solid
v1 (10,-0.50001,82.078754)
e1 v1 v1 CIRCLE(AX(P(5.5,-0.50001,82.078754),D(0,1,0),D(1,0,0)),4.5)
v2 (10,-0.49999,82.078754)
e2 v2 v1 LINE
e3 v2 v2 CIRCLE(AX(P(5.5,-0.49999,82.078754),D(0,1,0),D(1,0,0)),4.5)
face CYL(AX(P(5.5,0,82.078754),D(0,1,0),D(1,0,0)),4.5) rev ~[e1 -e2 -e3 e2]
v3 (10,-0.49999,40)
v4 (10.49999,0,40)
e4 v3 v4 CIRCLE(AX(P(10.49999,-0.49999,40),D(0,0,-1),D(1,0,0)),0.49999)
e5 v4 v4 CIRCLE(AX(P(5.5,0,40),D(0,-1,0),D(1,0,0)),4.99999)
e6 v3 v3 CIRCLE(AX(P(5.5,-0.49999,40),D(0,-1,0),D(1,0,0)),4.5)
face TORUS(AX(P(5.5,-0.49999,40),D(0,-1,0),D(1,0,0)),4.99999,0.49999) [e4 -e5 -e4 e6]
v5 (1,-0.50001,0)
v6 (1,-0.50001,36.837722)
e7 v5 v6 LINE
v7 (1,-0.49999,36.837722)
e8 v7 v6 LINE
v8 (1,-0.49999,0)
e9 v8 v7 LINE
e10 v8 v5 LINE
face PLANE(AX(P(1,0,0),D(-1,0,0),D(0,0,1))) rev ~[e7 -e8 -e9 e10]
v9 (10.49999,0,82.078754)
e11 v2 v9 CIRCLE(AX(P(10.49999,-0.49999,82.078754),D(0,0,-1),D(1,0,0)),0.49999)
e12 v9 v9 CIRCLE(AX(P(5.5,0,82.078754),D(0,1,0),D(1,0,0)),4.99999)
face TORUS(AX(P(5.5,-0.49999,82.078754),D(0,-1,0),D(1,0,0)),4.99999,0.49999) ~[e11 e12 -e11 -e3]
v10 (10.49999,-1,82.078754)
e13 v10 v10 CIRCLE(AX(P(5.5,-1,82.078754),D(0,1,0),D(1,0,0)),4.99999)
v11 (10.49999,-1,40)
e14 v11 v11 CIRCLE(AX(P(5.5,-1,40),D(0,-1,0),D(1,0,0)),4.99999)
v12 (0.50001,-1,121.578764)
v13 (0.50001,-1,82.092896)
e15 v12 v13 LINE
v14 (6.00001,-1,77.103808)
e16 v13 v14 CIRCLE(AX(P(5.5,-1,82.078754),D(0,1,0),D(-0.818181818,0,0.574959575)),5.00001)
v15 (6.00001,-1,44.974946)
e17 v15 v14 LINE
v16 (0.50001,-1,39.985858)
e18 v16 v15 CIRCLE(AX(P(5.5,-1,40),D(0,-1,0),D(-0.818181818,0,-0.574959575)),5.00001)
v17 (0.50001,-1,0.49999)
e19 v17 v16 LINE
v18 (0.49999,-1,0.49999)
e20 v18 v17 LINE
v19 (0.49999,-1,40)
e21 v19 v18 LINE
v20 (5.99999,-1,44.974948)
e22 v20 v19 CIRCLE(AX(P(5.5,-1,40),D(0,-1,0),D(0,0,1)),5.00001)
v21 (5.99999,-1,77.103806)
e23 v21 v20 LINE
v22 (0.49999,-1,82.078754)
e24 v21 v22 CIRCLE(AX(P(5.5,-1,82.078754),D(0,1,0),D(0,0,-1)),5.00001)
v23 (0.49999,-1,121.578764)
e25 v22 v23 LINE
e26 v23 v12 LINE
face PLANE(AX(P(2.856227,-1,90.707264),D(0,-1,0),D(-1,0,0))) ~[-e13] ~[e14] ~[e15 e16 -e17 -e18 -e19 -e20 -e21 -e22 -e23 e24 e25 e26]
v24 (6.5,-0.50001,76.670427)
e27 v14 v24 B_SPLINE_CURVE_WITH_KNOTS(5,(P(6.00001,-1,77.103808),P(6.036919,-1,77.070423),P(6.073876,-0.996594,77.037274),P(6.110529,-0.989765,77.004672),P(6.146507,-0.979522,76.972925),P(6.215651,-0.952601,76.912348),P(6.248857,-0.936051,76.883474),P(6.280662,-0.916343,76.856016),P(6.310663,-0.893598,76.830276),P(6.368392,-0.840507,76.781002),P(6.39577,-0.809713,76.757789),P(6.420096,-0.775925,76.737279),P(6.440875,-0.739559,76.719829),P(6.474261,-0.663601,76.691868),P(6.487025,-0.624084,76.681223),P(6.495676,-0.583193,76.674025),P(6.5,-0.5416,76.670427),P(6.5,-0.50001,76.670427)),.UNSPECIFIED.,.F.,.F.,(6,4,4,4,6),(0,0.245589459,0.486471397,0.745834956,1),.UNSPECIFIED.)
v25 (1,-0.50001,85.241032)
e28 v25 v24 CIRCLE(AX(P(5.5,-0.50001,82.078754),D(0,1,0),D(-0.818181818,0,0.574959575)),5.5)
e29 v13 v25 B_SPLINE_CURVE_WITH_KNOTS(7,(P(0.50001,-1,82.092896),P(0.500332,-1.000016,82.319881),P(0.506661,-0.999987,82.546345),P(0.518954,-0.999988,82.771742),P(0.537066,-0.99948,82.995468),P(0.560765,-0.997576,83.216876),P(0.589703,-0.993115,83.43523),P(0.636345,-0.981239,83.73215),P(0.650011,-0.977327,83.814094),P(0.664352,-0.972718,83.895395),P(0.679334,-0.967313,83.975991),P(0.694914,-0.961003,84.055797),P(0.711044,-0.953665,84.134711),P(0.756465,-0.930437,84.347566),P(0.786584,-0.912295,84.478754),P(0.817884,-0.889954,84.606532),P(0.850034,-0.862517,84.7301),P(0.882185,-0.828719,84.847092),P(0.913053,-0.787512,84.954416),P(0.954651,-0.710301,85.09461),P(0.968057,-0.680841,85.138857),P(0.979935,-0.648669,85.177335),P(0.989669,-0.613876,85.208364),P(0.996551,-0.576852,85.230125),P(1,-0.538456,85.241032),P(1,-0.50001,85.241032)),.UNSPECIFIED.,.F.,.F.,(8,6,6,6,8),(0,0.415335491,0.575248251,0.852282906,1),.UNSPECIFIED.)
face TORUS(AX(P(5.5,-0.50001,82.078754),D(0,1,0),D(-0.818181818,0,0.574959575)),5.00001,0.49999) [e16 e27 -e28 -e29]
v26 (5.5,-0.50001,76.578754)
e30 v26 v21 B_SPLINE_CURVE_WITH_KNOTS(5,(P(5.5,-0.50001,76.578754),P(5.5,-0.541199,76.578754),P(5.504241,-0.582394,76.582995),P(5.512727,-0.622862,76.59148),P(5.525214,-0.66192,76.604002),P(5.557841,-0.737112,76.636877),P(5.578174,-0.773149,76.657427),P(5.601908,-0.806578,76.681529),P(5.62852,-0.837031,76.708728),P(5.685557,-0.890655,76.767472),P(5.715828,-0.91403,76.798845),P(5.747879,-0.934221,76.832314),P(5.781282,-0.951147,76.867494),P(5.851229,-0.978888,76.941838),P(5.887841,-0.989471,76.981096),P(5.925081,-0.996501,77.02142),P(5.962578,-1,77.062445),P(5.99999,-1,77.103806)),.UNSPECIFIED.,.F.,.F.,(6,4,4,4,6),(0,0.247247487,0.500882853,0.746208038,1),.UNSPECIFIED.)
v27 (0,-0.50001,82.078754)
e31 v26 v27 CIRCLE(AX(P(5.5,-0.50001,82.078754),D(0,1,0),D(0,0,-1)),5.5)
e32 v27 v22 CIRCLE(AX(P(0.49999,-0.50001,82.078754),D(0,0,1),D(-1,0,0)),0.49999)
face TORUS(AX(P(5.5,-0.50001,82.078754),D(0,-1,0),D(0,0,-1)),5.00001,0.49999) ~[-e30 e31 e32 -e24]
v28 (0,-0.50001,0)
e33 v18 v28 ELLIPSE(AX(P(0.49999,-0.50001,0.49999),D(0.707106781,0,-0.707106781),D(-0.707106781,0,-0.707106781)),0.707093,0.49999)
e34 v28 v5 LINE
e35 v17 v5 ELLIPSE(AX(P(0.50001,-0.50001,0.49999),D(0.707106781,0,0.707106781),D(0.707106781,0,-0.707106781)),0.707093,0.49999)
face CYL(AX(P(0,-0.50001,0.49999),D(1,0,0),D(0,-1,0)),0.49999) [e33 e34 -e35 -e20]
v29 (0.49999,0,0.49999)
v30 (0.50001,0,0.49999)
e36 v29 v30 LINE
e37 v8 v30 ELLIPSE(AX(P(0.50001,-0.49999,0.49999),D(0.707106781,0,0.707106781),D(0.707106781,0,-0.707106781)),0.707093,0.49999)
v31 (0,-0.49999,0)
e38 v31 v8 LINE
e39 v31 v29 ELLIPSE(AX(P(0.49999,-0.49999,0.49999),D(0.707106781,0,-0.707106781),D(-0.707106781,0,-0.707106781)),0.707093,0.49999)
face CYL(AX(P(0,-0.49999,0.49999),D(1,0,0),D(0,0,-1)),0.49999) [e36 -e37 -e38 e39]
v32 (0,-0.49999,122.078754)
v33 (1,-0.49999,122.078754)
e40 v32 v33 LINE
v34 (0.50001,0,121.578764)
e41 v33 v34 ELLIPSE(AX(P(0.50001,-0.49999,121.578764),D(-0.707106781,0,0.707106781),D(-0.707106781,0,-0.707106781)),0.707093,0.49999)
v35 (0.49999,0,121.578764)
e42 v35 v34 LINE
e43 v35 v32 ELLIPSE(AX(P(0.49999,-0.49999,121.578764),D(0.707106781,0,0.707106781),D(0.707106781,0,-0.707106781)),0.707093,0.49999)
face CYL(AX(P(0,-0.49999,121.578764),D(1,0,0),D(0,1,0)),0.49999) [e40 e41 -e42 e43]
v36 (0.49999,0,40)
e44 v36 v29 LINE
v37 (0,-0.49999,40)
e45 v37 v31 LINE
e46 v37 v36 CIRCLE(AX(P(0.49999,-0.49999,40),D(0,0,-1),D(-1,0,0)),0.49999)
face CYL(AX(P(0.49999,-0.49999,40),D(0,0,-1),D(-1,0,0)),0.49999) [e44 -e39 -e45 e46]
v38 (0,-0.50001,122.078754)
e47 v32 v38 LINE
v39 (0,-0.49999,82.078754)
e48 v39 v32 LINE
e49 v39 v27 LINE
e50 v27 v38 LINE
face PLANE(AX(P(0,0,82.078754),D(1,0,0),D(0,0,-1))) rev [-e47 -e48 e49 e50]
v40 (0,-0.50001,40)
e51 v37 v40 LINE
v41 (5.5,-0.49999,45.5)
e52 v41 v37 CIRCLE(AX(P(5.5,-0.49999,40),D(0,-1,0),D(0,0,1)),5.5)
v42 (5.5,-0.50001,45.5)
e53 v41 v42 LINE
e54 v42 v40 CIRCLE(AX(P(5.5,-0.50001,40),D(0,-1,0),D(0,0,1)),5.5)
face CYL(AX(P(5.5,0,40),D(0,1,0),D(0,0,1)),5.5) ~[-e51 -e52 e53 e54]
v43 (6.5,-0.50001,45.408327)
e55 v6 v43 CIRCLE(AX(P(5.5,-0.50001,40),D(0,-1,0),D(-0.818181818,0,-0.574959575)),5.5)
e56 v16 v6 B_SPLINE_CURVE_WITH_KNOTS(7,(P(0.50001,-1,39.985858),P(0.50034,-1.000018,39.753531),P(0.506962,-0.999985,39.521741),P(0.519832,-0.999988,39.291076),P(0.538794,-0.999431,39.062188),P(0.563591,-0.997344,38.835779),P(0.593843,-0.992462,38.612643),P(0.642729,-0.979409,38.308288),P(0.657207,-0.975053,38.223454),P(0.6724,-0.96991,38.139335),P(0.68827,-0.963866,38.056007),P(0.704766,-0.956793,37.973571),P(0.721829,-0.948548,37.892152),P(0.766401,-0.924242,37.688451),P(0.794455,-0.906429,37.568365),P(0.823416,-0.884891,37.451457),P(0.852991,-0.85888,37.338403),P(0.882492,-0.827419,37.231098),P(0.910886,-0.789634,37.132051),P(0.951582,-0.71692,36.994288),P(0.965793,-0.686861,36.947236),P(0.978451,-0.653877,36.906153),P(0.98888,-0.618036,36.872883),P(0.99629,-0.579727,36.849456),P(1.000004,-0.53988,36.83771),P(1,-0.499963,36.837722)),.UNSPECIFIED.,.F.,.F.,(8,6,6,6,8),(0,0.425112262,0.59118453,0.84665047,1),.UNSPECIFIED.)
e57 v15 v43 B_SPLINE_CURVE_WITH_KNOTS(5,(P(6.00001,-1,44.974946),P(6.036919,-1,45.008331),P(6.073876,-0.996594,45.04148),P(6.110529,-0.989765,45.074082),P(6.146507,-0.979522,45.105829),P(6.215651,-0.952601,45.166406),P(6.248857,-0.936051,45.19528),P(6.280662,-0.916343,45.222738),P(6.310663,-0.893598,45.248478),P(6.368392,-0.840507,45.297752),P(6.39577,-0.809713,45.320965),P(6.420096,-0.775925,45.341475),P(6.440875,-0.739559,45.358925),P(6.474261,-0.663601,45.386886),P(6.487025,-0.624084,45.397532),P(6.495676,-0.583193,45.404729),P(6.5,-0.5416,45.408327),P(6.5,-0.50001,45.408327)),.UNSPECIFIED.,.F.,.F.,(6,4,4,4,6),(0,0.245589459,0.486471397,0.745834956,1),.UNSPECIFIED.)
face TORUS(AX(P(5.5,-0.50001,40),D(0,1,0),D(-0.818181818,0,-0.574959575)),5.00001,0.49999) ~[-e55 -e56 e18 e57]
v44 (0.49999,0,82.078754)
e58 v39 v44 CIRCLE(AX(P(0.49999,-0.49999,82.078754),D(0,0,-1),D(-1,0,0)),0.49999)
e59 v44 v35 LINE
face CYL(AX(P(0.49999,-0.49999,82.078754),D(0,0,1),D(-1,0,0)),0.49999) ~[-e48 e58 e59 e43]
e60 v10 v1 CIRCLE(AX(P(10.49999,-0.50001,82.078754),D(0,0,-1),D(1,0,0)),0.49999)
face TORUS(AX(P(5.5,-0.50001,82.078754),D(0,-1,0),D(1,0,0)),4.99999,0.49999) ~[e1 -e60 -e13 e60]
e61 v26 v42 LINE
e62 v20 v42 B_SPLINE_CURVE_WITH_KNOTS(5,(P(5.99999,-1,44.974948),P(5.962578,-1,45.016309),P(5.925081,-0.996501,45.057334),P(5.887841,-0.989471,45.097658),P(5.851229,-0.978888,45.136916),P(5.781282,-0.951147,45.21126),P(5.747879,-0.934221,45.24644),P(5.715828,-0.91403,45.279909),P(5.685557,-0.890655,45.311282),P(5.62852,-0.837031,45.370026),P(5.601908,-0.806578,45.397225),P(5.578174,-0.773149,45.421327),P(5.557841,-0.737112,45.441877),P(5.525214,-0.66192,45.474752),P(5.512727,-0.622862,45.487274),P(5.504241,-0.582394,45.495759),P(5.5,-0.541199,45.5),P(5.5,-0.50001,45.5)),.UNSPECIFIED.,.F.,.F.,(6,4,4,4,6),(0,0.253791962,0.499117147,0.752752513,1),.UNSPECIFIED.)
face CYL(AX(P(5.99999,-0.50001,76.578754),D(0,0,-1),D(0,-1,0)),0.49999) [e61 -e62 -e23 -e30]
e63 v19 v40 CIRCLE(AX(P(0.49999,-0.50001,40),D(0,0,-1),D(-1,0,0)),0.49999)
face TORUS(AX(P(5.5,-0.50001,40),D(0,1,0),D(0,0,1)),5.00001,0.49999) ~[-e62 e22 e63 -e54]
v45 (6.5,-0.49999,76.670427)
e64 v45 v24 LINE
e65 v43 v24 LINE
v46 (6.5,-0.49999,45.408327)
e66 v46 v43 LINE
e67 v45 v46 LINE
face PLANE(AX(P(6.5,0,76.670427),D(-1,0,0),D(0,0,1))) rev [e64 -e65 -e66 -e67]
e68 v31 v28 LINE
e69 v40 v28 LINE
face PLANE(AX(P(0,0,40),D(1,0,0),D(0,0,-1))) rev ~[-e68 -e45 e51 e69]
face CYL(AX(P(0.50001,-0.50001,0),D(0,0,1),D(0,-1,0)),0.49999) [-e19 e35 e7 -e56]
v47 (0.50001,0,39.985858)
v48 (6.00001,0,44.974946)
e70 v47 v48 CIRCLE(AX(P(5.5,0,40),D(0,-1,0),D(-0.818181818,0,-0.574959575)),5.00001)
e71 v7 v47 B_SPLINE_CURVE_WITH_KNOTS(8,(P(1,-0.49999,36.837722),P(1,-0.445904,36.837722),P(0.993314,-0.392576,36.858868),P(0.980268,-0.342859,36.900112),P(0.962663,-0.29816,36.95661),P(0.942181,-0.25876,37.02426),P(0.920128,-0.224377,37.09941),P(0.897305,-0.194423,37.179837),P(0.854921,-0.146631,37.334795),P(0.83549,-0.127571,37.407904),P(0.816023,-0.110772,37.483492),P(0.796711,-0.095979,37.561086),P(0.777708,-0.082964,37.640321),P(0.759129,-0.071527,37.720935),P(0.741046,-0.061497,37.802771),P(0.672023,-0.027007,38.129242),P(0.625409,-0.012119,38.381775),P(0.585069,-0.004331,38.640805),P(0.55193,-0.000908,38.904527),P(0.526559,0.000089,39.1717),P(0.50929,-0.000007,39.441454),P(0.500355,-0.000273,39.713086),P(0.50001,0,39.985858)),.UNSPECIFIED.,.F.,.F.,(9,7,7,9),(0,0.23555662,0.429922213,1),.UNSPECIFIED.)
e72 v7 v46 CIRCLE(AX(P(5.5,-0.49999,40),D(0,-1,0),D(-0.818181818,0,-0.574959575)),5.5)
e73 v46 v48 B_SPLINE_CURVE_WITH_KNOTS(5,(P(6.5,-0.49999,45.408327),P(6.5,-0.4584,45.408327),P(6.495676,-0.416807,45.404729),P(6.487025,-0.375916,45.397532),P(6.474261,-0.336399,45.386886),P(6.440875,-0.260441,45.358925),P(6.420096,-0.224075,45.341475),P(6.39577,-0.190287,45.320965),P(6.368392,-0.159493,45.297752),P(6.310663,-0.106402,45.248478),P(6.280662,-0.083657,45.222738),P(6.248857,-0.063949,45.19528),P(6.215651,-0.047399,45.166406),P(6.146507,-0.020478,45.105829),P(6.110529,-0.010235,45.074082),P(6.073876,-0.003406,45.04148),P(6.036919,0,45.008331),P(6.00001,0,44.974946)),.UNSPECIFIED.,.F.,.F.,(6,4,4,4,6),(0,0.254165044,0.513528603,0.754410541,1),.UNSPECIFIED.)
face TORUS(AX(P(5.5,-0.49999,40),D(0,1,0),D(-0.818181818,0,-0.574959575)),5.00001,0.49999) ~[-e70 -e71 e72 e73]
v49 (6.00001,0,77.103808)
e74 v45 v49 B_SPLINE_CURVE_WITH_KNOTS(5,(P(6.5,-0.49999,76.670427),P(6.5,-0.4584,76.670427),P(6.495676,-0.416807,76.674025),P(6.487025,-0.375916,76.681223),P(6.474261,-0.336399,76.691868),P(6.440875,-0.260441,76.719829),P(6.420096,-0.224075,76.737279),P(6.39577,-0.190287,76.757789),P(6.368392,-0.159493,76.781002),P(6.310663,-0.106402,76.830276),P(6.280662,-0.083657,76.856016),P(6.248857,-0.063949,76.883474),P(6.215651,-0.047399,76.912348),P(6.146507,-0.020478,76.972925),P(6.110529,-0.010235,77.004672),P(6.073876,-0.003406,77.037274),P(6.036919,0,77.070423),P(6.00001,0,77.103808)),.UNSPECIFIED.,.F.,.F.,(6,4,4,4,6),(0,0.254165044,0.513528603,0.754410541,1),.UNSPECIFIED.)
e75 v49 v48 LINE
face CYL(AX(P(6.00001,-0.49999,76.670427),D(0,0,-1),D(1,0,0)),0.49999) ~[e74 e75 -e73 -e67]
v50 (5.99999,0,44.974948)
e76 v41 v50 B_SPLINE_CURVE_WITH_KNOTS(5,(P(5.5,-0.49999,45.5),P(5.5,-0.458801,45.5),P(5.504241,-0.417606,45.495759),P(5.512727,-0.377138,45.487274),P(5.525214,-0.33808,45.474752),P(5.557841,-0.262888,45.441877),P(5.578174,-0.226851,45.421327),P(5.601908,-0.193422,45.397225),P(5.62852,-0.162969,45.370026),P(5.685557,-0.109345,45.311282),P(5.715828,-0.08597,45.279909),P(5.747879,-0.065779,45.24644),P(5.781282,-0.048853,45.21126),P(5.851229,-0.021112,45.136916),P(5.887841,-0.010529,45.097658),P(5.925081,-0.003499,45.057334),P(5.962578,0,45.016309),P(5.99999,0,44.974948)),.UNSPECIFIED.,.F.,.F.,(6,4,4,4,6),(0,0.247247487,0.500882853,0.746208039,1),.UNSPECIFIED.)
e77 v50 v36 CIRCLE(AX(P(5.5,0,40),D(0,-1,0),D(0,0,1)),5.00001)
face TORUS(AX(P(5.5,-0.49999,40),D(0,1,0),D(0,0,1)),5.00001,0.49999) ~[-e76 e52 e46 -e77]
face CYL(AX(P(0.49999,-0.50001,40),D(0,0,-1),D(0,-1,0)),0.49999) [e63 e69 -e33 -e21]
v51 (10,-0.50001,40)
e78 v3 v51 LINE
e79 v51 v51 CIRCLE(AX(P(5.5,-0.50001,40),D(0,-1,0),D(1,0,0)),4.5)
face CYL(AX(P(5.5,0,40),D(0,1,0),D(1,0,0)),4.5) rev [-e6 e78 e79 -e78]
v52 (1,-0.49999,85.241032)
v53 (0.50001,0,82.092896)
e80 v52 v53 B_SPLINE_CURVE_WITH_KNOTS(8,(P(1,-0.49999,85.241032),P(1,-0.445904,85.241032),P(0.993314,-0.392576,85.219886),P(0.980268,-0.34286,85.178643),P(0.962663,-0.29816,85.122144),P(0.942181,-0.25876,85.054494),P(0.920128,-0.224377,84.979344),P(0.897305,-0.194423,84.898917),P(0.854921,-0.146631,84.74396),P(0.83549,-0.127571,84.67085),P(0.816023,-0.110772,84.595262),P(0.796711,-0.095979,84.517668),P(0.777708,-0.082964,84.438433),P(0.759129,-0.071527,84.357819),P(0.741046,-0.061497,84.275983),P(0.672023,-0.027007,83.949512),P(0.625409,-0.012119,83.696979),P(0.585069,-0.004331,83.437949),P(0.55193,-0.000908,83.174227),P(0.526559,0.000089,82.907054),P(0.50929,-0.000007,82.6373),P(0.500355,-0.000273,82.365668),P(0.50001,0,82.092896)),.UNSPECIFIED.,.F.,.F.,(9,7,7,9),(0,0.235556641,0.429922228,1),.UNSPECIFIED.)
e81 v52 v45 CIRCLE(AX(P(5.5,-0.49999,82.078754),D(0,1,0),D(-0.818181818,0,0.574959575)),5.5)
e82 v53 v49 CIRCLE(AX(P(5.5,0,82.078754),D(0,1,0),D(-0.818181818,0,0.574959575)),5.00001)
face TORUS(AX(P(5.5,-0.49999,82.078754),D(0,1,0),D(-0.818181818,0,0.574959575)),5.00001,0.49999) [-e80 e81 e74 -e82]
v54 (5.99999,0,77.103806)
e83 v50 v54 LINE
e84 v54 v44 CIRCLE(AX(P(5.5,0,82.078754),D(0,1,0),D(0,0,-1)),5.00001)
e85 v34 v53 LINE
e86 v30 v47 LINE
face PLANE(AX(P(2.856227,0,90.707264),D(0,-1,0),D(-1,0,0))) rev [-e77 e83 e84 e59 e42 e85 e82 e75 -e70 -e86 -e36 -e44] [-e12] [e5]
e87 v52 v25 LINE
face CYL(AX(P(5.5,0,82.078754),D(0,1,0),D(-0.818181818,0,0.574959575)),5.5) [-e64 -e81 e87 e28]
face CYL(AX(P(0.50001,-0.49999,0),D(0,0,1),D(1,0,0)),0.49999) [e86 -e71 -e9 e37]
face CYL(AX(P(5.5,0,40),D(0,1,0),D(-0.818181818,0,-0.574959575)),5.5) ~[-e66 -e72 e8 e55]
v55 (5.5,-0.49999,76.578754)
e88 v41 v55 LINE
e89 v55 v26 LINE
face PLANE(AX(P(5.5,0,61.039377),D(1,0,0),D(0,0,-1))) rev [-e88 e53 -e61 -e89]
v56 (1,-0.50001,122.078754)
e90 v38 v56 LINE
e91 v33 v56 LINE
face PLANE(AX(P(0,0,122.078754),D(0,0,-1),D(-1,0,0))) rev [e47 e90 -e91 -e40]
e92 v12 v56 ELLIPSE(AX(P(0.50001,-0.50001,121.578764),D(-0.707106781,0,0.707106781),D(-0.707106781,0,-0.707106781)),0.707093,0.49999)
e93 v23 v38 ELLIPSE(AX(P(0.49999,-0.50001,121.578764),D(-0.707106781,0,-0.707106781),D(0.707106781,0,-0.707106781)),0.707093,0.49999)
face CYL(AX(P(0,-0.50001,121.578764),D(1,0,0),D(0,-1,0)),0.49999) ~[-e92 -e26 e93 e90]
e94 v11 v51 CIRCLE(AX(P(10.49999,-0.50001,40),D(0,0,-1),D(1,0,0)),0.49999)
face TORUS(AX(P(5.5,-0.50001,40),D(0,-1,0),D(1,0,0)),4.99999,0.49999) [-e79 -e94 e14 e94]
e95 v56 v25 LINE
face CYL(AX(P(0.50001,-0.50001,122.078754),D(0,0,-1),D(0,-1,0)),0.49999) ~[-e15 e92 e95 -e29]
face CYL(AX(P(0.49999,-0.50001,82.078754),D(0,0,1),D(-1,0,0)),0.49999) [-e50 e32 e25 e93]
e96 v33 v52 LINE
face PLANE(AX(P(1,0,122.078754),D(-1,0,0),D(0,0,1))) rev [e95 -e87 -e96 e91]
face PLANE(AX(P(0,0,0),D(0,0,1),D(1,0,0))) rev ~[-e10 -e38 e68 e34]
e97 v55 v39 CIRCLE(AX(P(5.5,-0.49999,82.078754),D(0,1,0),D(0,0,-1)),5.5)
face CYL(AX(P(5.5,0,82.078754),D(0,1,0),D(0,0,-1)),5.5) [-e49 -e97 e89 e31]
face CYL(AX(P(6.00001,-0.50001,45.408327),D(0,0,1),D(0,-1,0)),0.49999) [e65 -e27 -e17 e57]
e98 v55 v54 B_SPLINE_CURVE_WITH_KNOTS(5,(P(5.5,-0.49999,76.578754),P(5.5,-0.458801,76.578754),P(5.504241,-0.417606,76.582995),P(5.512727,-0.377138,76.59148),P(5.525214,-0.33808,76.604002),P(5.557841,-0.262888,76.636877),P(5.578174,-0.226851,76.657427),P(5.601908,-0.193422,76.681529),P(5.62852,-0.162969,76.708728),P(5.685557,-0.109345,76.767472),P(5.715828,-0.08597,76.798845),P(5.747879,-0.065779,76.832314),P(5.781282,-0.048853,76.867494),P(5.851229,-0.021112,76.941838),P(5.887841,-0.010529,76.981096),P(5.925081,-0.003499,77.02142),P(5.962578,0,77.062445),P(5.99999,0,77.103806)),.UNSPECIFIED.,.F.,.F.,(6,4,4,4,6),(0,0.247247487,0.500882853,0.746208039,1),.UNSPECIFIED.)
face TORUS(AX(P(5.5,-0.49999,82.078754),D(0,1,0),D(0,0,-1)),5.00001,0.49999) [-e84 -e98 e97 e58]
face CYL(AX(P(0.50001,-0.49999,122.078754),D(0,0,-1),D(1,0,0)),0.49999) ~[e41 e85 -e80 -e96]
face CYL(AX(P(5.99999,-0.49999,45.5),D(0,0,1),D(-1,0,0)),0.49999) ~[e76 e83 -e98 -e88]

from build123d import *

# Parameters (mm, degrees)
F0_R     = 4.4999999525
F1_DEPTH = 1
F3_R     = 0.49999


# Not quite as in the source:
# - a fillet or chamfer is up to 0.001 mm smaller than in the source, because OpenCascade refuses the exact size


with BuildPart() as f1:
    # F0 (on Front) → F1 (new body)
    with BuildSketch(Plane.XZ):
        with BuildLine():
            Line((0, 40), (0, 0))
            Line((0, 0), (1, 0))
            Line((1, 0), (1, 36.8377223398))
            ThreePointArc((1, 36.8377223398), (10.1288568078, 37.0295312402), (6.5000001341, 45.4083268884))
            Line((6.5000001341, 45.4083268884), (6.5000001341, 61.0393770039))
            Line((6.5000001341, 61.0393770039), (5.5, 61.0393770039))
            Line((5.5, 61.0393770039), (5.5, 45.5))
            ThreePointArc((5.5, 45.5), (1.6109127035, 43.8890872965), (0, 40))
        make_face()
        with Locations((5.5, 40)):
            Circle(F0_R, mode=Mode.SUBTRACT)
    extrude(amount=F1_DEPTH)

    # F2: F1 across face


with BuildPart() as f1_1:
    add(f1.part)
    add(f1.part.mirror(Plane(origin=(6.0000000671, -0.5, 61.0393770039), x_dir=(1, 0, 0), z_dir=(0, 0, 1))))

    # F3 (radius 0.5 in the source; OpenCascade refuses exactly that, so slightly less here)
    f3_edges = [f1_1.edges().sort_by_distance(p)[0] for p in [
        (6.5, -1, 61.039377),
        (10.128857, -1, 85.049223),
        (1, -1, 103.659893),
        (0.5, -1, 122.078754),
        (0, -1, 102.078754),
        (1.610913, -1, 78.189667),
        (5.5, -1, 61.039377),
        (1.610913, -1, 43.889087),
        (0, -1, 20),
        (0.5, -1, 0),
        (1, -1, 18.418861),
        (10.128857, -1, 37.029531),
        (1, -1, 40),
        (1, -1, 82.078754),
        (6.5, 0, 61.039377),
        (10.128857, 0, 85.049223),
        (1, 0, 103.659893),
        (0.5, 0, 122.078754),
        (0, 0, 102.078754),
        (1.610913, 0, 78.189667),
        (5.5, 0, 61.039377),
        (1.610913, 0, 43.889087),
        (0, 0, 20),
        (0.5, 0, 0),
        (1, 0, 18.418861),
        (10.128857, 0, 37.029531),
        (1, 0, 40),
        (1, 0, 82.078754),
    ]]
    fillet(f3_edges, radius=F3_R)


solid = f1_1.part
